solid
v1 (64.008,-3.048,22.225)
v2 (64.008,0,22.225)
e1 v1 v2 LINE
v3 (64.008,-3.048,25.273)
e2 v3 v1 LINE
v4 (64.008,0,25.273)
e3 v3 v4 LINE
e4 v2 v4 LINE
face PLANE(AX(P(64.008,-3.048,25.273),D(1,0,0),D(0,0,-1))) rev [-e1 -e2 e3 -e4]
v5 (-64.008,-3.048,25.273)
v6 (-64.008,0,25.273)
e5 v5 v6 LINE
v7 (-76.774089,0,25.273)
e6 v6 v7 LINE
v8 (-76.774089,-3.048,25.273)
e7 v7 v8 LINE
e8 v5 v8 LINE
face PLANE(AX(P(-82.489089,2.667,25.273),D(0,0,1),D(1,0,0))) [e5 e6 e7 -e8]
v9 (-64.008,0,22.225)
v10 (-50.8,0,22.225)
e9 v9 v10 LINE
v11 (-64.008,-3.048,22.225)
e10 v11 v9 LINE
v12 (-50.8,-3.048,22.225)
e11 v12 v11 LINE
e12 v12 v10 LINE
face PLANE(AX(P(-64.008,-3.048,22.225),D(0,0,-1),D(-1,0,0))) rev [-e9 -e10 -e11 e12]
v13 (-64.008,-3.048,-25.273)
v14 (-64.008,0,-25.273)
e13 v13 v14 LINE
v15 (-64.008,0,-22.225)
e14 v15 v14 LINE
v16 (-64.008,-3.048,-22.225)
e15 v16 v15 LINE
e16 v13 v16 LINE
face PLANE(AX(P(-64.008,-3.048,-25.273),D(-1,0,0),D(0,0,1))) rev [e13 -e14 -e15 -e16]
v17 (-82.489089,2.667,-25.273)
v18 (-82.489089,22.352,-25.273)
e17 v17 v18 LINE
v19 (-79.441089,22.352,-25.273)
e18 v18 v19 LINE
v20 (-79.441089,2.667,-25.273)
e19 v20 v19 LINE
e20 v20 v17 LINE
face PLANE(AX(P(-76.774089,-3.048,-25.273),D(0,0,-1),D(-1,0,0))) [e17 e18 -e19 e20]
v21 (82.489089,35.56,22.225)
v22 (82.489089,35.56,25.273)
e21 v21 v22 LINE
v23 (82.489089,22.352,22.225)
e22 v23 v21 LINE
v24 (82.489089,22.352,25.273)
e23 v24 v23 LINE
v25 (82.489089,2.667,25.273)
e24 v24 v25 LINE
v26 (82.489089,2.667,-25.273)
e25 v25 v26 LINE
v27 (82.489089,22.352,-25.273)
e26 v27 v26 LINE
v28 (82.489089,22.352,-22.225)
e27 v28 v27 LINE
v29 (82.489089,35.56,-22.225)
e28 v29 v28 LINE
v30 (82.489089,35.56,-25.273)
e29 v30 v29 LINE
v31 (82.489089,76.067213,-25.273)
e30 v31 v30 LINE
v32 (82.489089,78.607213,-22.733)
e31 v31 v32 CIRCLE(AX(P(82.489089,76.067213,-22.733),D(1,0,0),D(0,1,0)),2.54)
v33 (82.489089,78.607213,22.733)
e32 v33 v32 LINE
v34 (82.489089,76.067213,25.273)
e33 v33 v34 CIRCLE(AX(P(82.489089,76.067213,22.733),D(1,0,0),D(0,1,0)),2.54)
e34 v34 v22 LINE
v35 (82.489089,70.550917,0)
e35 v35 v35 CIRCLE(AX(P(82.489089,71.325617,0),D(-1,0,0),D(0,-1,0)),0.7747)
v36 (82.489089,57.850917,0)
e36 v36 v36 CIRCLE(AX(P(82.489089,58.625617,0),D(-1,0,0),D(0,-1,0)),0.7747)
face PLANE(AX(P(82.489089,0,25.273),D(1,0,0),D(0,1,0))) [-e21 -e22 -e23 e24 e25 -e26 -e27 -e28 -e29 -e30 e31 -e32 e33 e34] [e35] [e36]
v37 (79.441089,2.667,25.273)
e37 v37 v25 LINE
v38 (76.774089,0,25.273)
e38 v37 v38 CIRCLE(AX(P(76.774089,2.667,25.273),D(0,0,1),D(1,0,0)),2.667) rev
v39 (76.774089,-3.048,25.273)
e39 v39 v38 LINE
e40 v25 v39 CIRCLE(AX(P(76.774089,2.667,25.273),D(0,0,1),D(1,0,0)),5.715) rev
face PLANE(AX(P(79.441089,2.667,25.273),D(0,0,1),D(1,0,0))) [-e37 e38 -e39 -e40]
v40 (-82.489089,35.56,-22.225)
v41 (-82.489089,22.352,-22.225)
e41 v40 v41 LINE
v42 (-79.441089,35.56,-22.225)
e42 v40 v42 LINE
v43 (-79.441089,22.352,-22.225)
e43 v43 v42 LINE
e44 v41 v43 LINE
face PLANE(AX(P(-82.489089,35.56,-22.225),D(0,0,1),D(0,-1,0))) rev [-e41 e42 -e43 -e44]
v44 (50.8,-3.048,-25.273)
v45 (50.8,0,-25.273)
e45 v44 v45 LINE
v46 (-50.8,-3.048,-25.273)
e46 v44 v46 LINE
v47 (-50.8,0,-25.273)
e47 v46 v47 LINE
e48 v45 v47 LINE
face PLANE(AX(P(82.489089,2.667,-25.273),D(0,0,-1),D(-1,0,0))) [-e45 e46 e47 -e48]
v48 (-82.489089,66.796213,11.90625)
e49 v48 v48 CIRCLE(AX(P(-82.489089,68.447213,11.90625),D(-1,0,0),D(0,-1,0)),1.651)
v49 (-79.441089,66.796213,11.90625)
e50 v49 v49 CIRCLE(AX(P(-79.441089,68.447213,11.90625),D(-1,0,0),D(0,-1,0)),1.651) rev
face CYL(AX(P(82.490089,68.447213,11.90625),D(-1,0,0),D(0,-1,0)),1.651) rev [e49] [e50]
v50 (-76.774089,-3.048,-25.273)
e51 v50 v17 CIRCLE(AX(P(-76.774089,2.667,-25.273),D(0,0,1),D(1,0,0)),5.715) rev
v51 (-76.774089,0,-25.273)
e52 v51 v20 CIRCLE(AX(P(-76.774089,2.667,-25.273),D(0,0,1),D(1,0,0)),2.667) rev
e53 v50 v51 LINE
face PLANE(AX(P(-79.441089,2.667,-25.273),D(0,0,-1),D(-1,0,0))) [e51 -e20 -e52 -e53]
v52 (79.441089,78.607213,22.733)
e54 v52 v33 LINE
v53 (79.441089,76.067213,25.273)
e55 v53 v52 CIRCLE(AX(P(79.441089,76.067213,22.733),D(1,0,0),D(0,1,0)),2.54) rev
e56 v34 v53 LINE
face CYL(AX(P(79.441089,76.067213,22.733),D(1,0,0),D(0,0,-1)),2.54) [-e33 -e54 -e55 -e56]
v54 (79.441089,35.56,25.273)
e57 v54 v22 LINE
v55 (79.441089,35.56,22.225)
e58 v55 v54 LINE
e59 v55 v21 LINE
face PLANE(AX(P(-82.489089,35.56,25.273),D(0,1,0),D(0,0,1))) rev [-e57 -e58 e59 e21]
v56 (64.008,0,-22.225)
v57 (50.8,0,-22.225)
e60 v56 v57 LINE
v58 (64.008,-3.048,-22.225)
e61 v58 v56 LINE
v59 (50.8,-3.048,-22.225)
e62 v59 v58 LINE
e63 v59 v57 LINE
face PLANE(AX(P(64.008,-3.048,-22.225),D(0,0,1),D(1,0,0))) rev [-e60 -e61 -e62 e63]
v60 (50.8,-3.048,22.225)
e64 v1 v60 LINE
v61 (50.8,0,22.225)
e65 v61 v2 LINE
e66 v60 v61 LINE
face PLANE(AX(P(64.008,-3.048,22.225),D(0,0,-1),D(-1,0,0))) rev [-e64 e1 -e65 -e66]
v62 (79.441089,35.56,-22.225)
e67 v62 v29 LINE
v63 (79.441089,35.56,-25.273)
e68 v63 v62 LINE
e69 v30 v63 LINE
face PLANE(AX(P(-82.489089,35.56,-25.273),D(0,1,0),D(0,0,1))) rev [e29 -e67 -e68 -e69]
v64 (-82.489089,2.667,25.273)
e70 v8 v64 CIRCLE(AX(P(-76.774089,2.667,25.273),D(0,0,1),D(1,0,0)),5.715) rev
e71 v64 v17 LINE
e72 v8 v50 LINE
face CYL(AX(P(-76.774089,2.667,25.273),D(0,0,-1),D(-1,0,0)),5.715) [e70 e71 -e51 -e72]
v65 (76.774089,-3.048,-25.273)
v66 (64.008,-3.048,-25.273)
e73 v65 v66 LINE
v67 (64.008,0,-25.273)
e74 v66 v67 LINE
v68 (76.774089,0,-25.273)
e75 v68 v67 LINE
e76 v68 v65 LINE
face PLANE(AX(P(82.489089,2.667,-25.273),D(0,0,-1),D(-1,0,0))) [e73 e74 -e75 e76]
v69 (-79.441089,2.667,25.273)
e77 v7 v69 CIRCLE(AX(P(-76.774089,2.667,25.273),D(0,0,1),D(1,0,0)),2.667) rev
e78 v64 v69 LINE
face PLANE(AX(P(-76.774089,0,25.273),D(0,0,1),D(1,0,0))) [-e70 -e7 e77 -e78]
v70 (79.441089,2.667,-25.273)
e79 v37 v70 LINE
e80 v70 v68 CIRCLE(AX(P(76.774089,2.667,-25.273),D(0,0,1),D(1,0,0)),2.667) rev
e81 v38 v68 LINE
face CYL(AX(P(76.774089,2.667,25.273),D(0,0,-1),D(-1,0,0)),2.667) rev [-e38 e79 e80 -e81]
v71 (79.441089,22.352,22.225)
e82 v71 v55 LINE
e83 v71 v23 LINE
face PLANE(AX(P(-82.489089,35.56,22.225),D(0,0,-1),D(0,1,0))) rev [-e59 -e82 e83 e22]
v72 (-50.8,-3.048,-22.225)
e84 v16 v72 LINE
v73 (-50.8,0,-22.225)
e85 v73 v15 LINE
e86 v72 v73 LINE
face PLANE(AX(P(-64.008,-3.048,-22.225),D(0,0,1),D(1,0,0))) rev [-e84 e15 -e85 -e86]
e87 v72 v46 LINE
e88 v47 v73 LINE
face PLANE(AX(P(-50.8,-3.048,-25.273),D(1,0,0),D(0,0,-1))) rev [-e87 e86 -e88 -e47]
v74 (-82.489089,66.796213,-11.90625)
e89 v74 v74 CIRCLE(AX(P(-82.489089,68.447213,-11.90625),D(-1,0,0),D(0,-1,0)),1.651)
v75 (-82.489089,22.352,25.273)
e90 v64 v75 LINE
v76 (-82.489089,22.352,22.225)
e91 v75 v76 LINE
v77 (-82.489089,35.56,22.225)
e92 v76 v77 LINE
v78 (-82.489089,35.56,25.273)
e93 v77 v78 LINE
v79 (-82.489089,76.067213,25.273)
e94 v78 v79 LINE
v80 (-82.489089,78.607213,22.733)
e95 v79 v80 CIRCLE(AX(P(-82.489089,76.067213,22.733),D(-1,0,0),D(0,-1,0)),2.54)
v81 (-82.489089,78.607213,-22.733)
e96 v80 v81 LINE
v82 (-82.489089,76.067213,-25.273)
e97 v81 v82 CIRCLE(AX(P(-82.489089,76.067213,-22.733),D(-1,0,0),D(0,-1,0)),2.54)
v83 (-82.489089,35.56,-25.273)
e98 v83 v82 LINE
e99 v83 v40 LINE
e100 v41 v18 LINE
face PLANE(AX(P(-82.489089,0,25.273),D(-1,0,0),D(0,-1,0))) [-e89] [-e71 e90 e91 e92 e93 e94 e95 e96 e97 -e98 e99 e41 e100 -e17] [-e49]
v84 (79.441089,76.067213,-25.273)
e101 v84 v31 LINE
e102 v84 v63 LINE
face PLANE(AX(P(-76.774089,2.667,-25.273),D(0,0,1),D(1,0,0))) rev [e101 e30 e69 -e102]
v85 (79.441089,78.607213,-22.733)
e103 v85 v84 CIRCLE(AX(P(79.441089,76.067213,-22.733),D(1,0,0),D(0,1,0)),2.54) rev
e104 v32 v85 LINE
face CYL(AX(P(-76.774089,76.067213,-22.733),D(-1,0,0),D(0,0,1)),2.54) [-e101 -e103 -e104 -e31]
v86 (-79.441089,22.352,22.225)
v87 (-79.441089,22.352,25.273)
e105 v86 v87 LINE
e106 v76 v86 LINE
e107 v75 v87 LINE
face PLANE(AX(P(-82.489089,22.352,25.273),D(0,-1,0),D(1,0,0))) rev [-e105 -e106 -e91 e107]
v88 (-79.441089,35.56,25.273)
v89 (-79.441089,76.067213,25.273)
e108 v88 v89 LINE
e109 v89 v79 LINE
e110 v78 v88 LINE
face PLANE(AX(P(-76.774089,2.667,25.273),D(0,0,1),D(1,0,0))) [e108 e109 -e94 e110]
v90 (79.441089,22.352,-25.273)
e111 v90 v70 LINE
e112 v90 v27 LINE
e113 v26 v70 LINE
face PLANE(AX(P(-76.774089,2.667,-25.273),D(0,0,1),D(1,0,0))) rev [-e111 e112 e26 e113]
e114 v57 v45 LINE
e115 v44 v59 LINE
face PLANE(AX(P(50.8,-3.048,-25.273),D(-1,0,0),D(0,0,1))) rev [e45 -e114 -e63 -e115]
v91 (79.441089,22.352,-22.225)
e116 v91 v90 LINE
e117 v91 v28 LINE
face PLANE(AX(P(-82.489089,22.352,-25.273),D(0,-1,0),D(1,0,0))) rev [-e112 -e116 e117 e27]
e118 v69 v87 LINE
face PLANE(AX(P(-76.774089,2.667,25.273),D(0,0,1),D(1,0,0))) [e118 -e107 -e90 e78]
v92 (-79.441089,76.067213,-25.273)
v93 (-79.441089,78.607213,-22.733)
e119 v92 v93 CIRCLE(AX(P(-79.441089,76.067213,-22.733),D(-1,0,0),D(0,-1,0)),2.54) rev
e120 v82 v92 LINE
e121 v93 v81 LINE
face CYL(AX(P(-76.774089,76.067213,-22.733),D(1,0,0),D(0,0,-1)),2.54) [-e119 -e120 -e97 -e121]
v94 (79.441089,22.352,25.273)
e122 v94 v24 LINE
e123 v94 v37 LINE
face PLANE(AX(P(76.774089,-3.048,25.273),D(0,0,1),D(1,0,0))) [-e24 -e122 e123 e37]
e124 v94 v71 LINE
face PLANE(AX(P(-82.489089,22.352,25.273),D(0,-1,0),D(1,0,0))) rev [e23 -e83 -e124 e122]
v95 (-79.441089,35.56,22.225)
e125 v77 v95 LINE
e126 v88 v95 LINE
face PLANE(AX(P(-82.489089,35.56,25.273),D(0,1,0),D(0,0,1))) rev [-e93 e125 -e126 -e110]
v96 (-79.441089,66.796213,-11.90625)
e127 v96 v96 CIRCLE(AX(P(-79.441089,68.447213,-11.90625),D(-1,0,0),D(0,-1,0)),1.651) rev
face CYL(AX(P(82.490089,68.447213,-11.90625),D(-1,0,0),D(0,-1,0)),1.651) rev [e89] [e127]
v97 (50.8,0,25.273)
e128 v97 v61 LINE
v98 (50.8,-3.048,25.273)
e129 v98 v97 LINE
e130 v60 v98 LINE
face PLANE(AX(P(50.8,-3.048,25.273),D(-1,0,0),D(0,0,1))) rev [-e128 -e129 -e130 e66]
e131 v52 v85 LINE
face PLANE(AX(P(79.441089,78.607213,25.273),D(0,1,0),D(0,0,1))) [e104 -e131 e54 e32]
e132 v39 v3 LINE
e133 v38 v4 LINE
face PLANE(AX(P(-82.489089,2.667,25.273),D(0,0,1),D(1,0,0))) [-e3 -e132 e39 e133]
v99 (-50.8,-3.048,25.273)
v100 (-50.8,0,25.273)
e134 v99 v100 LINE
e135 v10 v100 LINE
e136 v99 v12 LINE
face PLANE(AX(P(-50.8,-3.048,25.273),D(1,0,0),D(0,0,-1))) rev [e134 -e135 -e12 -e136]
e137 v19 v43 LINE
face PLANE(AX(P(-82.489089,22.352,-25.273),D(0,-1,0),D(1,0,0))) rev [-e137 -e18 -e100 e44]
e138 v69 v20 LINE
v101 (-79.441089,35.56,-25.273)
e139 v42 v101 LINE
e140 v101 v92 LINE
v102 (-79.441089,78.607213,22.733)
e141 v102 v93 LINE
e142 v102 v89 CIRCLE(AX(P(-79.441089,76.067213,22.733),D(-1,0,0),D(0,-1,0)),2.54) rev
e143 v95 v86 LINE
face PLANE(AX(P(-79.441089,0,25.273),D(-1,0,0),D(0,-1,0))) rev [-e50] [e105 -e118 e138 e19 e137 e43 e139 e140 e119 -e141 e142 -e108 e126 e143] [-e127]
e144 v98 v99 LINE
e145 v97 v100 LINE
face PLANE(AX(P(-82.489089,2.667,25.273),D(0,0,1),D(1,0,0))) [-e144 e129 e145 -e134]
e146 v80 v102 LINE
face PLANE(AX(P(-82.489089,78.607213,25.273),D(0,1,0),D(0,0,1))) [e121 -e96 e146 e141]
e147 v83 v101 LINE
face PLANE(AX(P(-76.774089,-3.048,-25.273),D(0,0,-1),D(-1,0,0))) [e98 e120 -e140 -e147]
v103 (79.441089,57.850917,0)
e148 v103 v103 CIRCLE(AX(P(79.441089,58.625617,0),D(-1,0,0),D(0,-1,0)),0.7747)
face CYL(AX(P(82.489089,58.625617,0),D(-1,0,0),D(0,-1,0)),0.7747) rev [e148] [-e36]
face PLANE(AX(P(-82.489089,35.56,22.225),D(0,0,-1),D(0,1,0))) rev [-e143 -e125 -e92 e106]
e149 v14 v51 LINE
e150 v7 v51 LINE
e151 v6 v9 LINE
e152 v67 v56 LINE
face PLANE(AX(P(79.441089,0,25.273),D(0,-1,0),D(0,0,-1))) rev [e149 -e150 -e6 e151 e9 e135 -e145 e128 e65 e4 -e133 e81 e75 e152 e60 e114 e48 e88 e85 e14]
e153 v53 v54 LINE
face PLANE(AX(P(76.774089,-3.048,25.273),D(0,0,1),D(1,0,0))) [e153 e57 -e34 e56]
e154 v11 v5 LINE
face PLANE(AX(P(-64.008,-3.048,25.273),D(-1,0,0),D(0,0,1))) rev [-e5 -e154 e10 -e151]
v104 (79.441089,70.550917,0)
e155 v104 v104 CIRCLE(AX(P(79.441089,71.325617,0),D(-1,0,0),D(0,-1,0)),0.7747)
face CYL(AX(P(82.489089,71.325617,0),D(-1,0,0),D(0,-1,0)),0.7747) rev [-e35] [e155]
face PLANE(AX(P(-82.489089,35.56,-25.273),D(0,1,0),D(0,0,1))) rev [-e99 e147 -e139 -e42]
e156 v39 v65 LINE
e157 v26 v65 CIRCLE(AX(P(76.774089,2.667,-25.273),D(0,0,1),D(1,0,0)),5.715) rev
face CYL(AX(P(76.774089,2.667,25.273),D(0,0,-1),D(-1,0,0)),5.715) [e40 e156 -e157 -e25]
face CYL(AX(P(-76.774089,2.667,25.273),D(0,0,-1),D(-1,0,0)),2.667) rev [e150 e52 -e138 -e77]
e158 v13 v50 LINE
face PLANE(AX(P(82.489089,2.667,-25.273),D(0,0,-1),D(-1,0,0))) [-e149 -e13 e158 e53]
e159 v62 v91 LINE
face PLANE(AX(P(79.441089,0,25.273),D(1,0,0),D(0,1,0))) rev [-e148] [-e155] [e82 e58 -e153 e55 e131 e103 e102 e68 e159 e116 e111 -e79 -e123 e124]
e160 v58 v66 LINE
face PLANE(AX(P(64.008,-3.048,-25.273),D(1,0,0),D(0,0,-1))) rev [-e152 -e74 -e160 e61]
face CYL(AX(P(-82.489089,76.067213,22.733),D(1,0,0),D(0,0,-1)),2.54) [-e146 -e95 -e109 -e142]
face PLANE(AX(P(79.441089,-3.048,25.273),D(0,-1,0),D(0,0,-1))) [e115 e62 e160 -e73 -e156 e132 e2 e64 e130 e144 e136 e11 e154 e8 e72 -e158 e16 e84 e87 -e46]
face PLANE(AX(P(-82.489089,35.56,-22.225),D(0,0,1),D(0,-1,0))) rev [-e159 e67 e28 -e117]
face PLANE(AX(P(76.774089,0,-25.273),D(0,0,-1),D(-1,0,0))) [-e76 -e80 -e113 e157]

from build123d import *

# Parameters (mm, degrees)
BASE_FLANGE1_DEPTH      = 25.273
CUT_EXTRUDE1_DEPTH      = 117.714472655
CUT_EXTRUDE1_DEPTH_BACK = 117.714472655
SKETCH6_W               = 13.208
SKETCH6_H               = 3.048
CUT_EXTRUDE2_DEPTH      = 182.766885422
CUT_EXTRUDE2_DEPTH_BACK = 182.766885422
SKETCH7_W               = 3.048
SKETCH7_H               = 13.208
FILLET1_R               = 2.54
SKETCH8_R               = 0.7747
CUT_EXTRUDE3_DEPTH      = 182.766885422
CUT_EXTRUDE5_REACH      = 186.487
SKETCH10_R              = 1.651


# Sheet-metal steps are written as plain solids
with BuildPart() as part:
    # Sketch1 → Base-Flange1 (new, symmetric)
    with BuildSketch(Plane.XY):
        with BuildLine():
            Line((79.441088515, 78.607212609), (79.441088515, 2.667))
            ThreePointArc((79.441088515, 2.667), (78.6599423, 0.781146215), (76.774088515, 0))
            Line((76.774088515, 0), (-76.774088515, 0))
            ThreePointArc((-76.774088515, 0), (-78.6599423, 0.781146215), (-79.441088515, 2.667))
            Line((-79.441088515, 2.667), (-79.441088515, 78.607212609))
            Line((-79.441088515, 78.607212609), (-82.489088515, 78.607212609))
            Line((-82.489088515, 78.607212609), (-82.489088515, 2.667))
            ThreePointArc((-82.489088515, 2.667), (-80.815203769, -1.374115254), (-76.774088515, -3.048))
            Line((-76.774088515, -3.048), (76.774088515, -3.048))
            ThreePointArc((76.774088515, -3.048), (80.815203769, -1.374115254), (82.489088515, 2.667))
            Line((82.489088515, 2.667), (82.489088515, 78.607212609))
            Line((82.489088515, 78.607212609), (79.441088515, 78.607212609))
        make_face()
    extrude(amount=BASE_FLANGE1_DEPTH, both=True)

    # Sketch6 → Cut-Extrude1 (cut, two sides: drawn at the far end of the back side and taken through both)
    with BuildSketch(Plane(origin=(0, 0, 0), x_dir=(1, 0, 0), z_dir=(0, 1, 0)).offset(-CUT_EXTRUDE1_DEPTH_BACK)):
        with Locations((-57.404, 23.749)):
            Rectangle(SKETCH6_W, SKETCH6_H)
        with Locations((-57.404, -23.749)):
            Rectangle(SKETCH6_W, SKETCH6_H)
        with Locations((57.404, -23.749)):
            Rectangle(SKETCH6_W, SKETCH6_H)
        with Locations((57.404, 23.749)):
            Rectangle(SKETCH6_W, SKETCH6_H)
    extrude(amount=CUT_EXTRUDE1_DEPTH + CUT_EXTRUDE1_DEPTH_BACK, mode=Mode.SUBTRACT)

    # Sketch7 → Cut-Extrude2 (cut, two sides: drawn at the far end of the back side and taken through both)
    with BuildSketch(Plane(origin=(-79.441088515, 0, 0), x_dir=(0, 0, -1), z_dir=(1, 0, 0)).offset(-CUT_EXTRUDE2_DEPTH_BACK)):
        with Locations((-23.749, 28.956)):
            Rectangle(SKETCH7_W, SKETCH7_H)
        with Locations((23.749, 28.956)):
            Rectangle(SKETCH7_W, SKETCH7_H)
    extrude(amount=CUT_EXTRUDE2_DEPTH + CUT_EXTRUDE2_DEPTH_BACK, mode=Mode.SUBTRACT)

    # Fillet1
    fillet1_edges = [part.edges().sort_by_distance(p)[0] for p in [
        (80.965088515, 78.607212609, -25.273),
        (-80.965088515, 78.607212609, -25.273),
        (80.965088515, 78.607212609, 25.273),
        (-80.965088515, 78.607212609, 25.273),
    ]]
    fillet(fillet1_edges, radius=FILLET1_R)

    # Sketch8 → Cut-Extrude3 (cut, through all)
    with BuildSketch(Plane.ZY.offset(-79.441088515)):
        with Locations(Location((0, 58.625617182, 0), (0, 0, 270))):
            Circle(SKETCH8_R)
        with Locations(Location((0, 71.325617182, 0), (0, 0, 270))):
            Circle(SKETCH8_R)
    extrude(amount=-CUT_EXTRUDE3_DEPTH, mode=Mode.SUBTRACT)

    # Sketch10 → Cut-Extrude5 (cut, up to next)
    with BuildSketch(Plane.ZY.offset(82.489088515), mode=Mode.PRIVATE) as cut_extrude5_sk1:
        with Locations(Location((11.90625, 68.447212609, 0), (0, 0, 270))):
            Circle(SKETCH10_R)
    cut_extrude5_tool1 = extrude(cut_extrude5_sk1.sketch, amount=-CUT_EXTRUDE5_REACH, mode=Mode.PRIVATE) & part.part
    # Sketch10 → Cut-Extrude5 (cut, up to next)
    with BuildSketch(Plane.ZY.offset(82.489088515), mode=Mode.PRIVATE) as cut_extrude5_sk2:
        with Locations(Location((-11.90625, 68.447212609, 0), (0, 0, 270))):
            Circle(SKETCH10_R)
    cut_extrude5_tool2 = extrude(cut_extrude5_sk2.sketch, amount=-CUT_EXTRUDE5_REACH, mode=Mode.PRIVATE) & part.part
    add(cut_extrude5_tool1.solids().sort_by_distance((-82.489089, 68.447213, 11.90625))[0], mode=Mode.SUBTRACT)
    add(cut_extrude5_tool2.solids().sort_by_distance((-82.489089, 68.447213, -11.90625))[0], mode=Mode.SUBTRACT)


solid = part.part
